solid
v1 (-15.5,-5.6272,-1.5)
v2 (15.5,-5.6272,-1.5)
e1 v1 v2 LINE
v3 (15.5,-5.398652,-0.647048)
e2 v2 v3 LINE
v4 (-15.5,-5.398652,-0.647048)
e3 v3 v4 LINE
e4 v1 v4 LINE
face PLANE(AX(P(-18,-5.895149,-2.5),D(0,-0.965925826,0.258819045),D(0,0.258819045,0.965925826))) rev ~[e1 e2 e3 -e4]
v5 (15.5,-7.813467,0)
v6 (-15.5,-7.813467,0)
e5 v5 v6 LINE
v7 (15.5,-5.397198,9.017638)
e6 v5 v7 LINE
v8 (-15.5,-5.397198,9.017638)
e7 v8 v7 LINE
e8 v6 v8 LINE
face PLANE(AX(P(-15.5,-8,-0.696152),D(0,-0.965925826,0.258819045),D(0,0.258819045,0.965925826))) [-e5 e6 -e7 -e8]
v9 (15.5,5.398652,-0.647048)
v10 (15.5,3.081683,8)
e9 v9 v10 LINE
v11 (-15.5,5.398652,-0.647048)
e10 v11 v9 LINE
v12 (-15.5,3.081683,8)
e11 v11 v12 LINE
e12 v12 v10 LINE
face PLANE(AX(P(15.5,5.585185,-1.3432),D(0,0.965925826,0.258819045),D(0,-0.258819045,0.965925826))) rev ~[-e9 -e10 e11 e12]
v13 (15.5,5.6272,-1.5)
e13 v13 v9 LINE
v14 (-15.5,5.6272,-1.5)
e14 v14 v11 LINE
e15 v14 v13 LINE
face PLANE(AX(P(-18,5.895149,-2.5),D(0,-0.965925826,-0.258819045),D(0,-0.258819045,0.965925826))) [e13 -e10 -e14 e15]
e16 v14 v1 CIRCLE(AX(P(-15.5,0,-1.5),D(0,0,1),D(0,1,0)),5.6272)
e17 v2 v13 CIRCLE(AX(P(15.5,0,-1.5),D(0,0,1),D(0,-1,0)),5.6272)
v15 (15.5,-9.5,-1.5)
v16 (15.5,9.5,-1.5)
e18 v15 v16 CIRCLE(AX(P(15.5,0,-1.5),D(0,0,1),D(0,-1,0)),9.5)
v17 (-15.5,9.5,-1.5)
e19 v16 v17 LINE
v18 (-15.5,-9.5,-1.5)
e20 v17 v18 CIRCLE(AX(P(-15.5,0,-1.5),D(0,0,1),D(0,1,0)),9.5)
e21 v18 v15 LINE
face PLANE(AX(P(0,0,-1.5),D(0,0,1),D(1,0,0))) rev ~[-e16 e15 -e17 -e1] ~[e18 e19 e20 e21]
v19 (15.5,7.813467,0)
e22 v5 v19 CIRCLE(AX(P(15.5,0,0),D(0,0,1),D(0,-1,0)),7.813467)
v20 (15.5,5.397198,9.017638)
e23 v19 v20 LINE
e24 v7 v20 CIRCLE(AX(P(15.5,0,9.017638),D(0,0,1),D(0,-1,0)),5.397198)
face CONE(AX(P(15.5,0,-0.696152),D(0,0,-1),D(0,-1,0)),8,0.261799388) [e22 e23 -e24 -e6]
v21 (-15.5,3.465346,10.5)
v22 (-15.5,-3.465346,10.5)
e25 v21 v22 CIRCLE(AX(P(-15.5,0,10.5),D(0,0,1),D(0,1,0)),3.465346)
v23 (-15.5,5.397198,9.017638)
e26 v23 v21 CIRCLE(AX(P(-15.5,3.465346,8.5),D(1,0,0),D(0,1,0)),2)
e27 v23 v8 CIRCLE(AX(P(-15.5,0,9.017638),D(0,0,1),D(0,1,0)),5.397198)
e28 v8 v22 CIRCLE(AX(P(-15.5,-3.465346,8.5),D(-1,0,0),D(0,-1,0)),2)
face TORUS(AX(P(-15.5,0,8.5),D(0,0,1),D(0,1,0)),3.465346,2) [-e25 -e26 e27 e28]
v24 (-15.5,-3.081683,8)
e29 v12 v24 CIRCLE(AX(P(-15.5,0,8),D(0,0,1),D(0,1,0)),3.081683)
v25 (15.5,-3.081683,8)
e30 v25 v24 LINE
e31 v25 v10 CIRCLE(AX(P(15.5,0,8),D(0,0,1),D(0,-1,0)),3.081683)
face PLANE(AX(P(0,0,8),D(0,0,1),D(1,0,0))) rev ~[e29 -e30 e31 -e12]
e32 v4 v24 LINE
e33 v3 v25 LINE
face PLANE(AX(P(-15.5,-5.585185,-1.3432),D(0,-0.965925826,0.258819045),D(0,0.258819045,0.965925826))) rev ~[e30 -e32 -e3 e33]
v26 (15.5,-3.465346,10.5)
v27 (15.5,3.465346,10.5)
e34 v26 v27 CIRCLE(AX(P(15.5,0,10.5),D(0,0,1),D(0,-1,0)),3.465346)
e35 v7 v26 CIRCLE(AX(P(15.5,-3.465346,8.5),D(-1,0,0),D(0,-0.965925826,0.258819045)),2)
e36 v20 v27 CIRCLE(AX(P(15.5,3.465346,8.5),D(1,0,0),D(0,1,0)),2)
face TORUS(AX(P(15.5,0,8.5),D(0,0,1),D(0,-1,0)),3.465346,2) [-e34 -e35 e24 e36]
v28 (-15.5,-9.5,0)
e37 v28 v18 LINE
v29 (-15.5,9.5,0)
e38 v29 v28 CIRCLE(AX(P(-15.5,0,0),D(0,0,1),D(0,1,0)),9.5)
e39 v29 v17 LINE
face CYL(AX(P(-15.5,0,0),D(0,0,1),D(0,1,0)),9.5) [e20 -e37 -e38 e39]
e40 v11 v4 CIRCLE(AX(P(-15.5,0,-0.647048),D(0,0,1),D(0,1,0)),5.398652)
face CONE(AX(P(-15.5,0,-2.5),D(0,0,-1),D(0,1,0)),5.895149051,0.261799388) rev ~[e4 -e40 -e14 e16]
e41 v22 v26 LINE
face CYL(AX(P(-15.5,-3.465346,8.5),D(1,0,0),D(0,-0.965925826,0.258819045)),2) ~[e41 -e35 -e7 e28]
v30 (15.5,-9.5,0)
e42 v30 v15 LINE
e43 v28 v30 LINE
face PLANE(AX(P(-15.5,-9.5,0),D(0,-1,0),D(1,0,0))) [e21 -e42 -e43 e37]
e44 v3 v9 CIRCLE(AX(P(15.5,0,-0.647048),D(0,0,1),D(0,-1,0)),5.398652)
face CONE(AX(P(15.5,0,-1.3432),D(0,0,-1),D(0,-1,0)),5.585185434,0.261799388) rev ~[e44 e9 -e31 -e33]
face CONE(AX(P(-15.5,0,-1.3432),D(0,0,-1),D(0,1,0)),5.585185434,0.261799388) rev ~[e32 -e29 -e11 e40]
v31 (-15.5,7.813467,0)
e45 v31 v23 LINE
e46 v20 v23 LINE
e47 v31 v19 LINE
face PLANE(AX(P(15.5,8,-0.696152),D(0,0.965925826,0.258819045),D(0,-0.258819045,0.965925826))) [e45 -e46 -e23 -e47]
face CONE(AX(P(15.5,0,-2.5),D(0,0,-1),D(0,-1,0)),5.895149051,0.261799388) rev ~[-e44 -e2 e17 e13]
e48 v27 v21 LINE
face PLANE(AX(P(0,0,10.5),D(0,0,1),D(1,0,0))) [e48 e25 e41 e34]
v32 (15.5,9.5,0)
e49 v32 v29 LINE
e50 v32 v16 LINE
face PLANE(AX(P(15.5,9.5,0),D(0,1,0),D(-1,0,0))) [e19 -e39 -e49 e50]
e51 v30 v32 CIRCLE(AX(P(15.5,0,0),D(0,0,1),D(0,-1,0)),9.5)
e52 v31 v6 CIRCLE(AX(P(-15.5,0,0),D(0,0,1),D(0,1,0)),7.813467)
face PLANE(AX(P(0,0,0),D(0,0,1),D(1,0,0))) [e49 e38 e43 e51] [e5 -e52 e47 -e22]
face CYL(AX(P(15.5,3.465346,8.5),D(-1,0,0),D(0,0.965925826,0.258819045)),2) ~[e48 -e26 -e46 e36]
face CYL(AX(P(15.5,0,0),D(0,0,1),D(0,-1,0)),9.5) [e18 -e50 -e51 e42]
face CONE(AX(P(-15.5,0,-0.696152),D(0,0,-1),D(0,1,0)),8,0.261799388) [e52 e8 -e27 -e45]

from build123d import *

# Parameters (mm, degrees)
F1_DEPTH     = 1.5
F3_DEPTH     = 10.5
F4_T4_DEPTH  = 31
F4_T9_ANGLE  = 180
F4_T14_DEPTH = 31
F4_T19_ANGLE = 180
F5_T         = 2.5
F5_T3_DEPTH  = 36
F5_T6_ANGLE  = 180.000000001
F5_T8_ANGLE  = 180.000000001
F6_R         = 2


# Not quite as in the source:
# - a fillet or chamfer that OpenCascade refuses, or shapes differently, is made with other operations: its cross-section is extruded or revolved along the edge and cut away or added
# - a shell that OpenCascade refuses in one call is made with other operations: the cavity is built on its own and cut out


with BuildPart() as f1:
    # F0 (on Top) → F1 (new body)
    with BuildSketch(Plane.XY):
        with BuildLine():
            Line((15.5, 9.5), (-15.5, 9.5))
            ThreePointArc((-15.5, 9.5), (-25, 0), (-15.5, -9.5))
            Line((-15.5, -9.5), (15.5, -9.5))
            ThreePointArc((15.5, -9.5), (25, 0), (15.5, 9.5))
        make_face()
        with BuildLine():
            ThreePointArc((-15.5, -8), (-23.5, 0), (-15.5, 8))
            Line((-15.5, 8), (15.5, 8))
            ThreePointArc((15.5, 8), (23.5, 0), (15.5, -8))
            Line((15.5, -8), (-15.5, -8))
        make_face(mode=Mode.SUBTRACT)
        with BuildLine():
            Line((15.5, 8), (-15.5, 8))
            ThreePointArc((-15.5, 8), (-23.5, 0), (-15.5, -8))
            Line((-15.5, -8), (15.5, -8))
            ThreePointArc((15.5, -8), (23.5, 0), (15.5, 8))
        make_face()
    extrude(amount=-F1_DEPTH)

    # F2 (on face) → F3 (join)
    with BuildSketch(Plane.XY):
        with BuildLine():
            Line((15.5, 8), (-15.5, 8))
            ThreePointArc((-15.5, 8), (-23.5, 0), (-15.5, -8))
            Line((-15.5, -8), (15.5, -8))
            ThreePointArc((15.5, -8), (23.5, 0), (15.5, 8))
        make_face()
    extrude(amount=F3_DEPTH)

    # F4: chamfer of 3 x 11.1961524227 on 4 edges, made by hand


with BuildPart() as f4_tool2:
    # F4_s3 → F4_t4 (new body)
    with BuildSketch(Plane.YZ.offset(-15.5)):
        Polygon((-8, -0.6961524227), (-5, 10.5), (-8, 10.5), align=None)
    extrude(amount=F4_T4_DEPTH)

    split(bisect_by=Plane.XY, keep=Keep.TOP)


with BuildPart() as f1_1:
    add(f1.part)

    # F4_t1: cut F4_tool2
    add(f4_tool2.part, mode=Mode.SUBTRACT)


with BuildPart() as f4_tool7:
    # F4_s8 → F4_t9 (revolve)
    with BuildSketch(Plane.YZ.offset(15.5)):
        Polygon((-8, -0.6961524227), (-5, 10.5), (-8, 10.5), align=None)
    revolve(axis=Axis((15.5, 0, 10.5), (0, 0, 1)), revolution_arc=F4_T9_ANGLE)

    split(bisect_by=Plane.XY, keep=Keep.TOP)


with BuildPart() as f1_2:
    add(f1_1.part)

    # F4_t6: cut F4_tool7
    add(f4_tool7.part, mode=Mode.SUBTRACT)


with BuildPart() as f4_tool12:
    # F4_s13 → F4_t14 (new body)
    with BuildSketch(Plane.YZ.offset(15.5)):
        Polygon((8, -0.6961524227), (5, 10.5), (8, 10.5), align=None)
    extrude(amount=-F4_T14_DEPTH)

    split(bisect_by=Plane.XY, keep=Keep.TOP)


with BuildPart() as f1_3:
    add(f1_2.part)

    # F4_t11: cut F4_tool12
    add(f4_tool12.part, mode=Mode.SUBTRACT)


with BuildPart() as f4_tool17:
    # F4_s18 → F4_t19 (revolve)
    with BuildSketch(Plane.YZ.offset(-15.5)):
        Polygon((8, -0.6961524227), (5, 10.5), (8, 10.5), align=None)
    revolve(axis=Axis((-15.5, 0, 10.5), (0, 0, 1)), revolution_arc=F4_T19_ANGLE)

    split(bisect_by=Plane.XY, keep=Keep.TOP)


with BuildPart() as f1_4:
    add(f1_3.part)

    # F4_t16: cut F4_tool17
    add(f4_tool17.part, mode=Mode.SUBTRACT)

    # F5: shell of thickness 2.5, made by hand


with BuildPart() as f5_core1:
    # F5_t2: copy of F1
    add(f1_4.part)

    # the walls: a layer under each face that stays
    f5_faces = [f5_core1.faces().sort_by_distance(p)[0] for p in [
        (25, 0, -0.75),
        (0, -9.5, -0.75),
        (0, 9.5, -0.75),
        (-21.4285714286, -5.4285714286, 0),
        (-25, 0, -0.75),
        (0, -6.4067332603, 5.25),
        (0, 6.4067332603, 5.25),
        (21.9067332603, 0, 5.25),
        (-21.9067332603, 0, 5.25),
        (0, 0, 10.5),
    ]]
    thicken(f5_faces, amount=-F5_T, mode=Mode.SUBTRACT)

    # F5_s4 → F5_t3 (cut)
    with BuildSketch(Plane.YZ.offset(-18)):
        Polygon((-7.8376146662, 0.0314704761), (-7.8134665205, -2.5), (-5.8951490506, -2.5), (-5.3986519548, -0.6470476128), align=None)
        Polygon((7.8376146662, 0.0314704761), (7.8134665205, -2.5), (5.8951490506, -2.5), (5.3986519548, -0.6470476128), align=None)
    extrude(amount=F5_T3_DEPTH, mode=Mode.SUBTRACT)

    # F5_s5 → F5_t6 (revolve, cut)
    with BuildSketch(Plane.YZ.offset(-15.5)):
        Polygon((7.8376146662, 0.0314704761), (7.8134665205, -2.5), (5.8951490506, -2.5), (5.3986519548, -0.6470476128), align=None)
    revolve(axis=Axis((-15.5, 0, 0), (0, 0, 1)), revolution_arc=F5_T6_ANGLE, mode=Mode.SUBTRACT)

    # F5_s7 → F5_t8 (revolve, cut)
    with BuildSketch(Plane.YZ.offset(15.5)):
        Polygon((-7.8376146662, 0.0314704761), (-7.8134665205, -2.5), (-5.8951490506, -2.5), (-5.3986519548, -0.6470476128), align=None)
    revolve(axis=Axis((15.5, 0, 0), (0, 0, 1)), revolution_arc=F5_T8_ANGLE, mode=Mode.SUBTRACT)


with BuildPart() as f1_5:
    add(f1_4.part)

    # what is left inside the walls is the cavity
    f5_cavity = [f5_core1.part.solids().sort_by_distance(p)[0] for p in [
        (0, -1.875733, -1.475),
    ]]
    add(f5_cavity, mode=Mode.SUBTRACT)

    # F6
    f6_edges = [f1_5.edges().sort_by_distance(p)[0] for p in [
        (-20.5, 0, 10.5),
    ]]
    fillet(f6_edges, radius=F6_R)


solid = f1_5.part
